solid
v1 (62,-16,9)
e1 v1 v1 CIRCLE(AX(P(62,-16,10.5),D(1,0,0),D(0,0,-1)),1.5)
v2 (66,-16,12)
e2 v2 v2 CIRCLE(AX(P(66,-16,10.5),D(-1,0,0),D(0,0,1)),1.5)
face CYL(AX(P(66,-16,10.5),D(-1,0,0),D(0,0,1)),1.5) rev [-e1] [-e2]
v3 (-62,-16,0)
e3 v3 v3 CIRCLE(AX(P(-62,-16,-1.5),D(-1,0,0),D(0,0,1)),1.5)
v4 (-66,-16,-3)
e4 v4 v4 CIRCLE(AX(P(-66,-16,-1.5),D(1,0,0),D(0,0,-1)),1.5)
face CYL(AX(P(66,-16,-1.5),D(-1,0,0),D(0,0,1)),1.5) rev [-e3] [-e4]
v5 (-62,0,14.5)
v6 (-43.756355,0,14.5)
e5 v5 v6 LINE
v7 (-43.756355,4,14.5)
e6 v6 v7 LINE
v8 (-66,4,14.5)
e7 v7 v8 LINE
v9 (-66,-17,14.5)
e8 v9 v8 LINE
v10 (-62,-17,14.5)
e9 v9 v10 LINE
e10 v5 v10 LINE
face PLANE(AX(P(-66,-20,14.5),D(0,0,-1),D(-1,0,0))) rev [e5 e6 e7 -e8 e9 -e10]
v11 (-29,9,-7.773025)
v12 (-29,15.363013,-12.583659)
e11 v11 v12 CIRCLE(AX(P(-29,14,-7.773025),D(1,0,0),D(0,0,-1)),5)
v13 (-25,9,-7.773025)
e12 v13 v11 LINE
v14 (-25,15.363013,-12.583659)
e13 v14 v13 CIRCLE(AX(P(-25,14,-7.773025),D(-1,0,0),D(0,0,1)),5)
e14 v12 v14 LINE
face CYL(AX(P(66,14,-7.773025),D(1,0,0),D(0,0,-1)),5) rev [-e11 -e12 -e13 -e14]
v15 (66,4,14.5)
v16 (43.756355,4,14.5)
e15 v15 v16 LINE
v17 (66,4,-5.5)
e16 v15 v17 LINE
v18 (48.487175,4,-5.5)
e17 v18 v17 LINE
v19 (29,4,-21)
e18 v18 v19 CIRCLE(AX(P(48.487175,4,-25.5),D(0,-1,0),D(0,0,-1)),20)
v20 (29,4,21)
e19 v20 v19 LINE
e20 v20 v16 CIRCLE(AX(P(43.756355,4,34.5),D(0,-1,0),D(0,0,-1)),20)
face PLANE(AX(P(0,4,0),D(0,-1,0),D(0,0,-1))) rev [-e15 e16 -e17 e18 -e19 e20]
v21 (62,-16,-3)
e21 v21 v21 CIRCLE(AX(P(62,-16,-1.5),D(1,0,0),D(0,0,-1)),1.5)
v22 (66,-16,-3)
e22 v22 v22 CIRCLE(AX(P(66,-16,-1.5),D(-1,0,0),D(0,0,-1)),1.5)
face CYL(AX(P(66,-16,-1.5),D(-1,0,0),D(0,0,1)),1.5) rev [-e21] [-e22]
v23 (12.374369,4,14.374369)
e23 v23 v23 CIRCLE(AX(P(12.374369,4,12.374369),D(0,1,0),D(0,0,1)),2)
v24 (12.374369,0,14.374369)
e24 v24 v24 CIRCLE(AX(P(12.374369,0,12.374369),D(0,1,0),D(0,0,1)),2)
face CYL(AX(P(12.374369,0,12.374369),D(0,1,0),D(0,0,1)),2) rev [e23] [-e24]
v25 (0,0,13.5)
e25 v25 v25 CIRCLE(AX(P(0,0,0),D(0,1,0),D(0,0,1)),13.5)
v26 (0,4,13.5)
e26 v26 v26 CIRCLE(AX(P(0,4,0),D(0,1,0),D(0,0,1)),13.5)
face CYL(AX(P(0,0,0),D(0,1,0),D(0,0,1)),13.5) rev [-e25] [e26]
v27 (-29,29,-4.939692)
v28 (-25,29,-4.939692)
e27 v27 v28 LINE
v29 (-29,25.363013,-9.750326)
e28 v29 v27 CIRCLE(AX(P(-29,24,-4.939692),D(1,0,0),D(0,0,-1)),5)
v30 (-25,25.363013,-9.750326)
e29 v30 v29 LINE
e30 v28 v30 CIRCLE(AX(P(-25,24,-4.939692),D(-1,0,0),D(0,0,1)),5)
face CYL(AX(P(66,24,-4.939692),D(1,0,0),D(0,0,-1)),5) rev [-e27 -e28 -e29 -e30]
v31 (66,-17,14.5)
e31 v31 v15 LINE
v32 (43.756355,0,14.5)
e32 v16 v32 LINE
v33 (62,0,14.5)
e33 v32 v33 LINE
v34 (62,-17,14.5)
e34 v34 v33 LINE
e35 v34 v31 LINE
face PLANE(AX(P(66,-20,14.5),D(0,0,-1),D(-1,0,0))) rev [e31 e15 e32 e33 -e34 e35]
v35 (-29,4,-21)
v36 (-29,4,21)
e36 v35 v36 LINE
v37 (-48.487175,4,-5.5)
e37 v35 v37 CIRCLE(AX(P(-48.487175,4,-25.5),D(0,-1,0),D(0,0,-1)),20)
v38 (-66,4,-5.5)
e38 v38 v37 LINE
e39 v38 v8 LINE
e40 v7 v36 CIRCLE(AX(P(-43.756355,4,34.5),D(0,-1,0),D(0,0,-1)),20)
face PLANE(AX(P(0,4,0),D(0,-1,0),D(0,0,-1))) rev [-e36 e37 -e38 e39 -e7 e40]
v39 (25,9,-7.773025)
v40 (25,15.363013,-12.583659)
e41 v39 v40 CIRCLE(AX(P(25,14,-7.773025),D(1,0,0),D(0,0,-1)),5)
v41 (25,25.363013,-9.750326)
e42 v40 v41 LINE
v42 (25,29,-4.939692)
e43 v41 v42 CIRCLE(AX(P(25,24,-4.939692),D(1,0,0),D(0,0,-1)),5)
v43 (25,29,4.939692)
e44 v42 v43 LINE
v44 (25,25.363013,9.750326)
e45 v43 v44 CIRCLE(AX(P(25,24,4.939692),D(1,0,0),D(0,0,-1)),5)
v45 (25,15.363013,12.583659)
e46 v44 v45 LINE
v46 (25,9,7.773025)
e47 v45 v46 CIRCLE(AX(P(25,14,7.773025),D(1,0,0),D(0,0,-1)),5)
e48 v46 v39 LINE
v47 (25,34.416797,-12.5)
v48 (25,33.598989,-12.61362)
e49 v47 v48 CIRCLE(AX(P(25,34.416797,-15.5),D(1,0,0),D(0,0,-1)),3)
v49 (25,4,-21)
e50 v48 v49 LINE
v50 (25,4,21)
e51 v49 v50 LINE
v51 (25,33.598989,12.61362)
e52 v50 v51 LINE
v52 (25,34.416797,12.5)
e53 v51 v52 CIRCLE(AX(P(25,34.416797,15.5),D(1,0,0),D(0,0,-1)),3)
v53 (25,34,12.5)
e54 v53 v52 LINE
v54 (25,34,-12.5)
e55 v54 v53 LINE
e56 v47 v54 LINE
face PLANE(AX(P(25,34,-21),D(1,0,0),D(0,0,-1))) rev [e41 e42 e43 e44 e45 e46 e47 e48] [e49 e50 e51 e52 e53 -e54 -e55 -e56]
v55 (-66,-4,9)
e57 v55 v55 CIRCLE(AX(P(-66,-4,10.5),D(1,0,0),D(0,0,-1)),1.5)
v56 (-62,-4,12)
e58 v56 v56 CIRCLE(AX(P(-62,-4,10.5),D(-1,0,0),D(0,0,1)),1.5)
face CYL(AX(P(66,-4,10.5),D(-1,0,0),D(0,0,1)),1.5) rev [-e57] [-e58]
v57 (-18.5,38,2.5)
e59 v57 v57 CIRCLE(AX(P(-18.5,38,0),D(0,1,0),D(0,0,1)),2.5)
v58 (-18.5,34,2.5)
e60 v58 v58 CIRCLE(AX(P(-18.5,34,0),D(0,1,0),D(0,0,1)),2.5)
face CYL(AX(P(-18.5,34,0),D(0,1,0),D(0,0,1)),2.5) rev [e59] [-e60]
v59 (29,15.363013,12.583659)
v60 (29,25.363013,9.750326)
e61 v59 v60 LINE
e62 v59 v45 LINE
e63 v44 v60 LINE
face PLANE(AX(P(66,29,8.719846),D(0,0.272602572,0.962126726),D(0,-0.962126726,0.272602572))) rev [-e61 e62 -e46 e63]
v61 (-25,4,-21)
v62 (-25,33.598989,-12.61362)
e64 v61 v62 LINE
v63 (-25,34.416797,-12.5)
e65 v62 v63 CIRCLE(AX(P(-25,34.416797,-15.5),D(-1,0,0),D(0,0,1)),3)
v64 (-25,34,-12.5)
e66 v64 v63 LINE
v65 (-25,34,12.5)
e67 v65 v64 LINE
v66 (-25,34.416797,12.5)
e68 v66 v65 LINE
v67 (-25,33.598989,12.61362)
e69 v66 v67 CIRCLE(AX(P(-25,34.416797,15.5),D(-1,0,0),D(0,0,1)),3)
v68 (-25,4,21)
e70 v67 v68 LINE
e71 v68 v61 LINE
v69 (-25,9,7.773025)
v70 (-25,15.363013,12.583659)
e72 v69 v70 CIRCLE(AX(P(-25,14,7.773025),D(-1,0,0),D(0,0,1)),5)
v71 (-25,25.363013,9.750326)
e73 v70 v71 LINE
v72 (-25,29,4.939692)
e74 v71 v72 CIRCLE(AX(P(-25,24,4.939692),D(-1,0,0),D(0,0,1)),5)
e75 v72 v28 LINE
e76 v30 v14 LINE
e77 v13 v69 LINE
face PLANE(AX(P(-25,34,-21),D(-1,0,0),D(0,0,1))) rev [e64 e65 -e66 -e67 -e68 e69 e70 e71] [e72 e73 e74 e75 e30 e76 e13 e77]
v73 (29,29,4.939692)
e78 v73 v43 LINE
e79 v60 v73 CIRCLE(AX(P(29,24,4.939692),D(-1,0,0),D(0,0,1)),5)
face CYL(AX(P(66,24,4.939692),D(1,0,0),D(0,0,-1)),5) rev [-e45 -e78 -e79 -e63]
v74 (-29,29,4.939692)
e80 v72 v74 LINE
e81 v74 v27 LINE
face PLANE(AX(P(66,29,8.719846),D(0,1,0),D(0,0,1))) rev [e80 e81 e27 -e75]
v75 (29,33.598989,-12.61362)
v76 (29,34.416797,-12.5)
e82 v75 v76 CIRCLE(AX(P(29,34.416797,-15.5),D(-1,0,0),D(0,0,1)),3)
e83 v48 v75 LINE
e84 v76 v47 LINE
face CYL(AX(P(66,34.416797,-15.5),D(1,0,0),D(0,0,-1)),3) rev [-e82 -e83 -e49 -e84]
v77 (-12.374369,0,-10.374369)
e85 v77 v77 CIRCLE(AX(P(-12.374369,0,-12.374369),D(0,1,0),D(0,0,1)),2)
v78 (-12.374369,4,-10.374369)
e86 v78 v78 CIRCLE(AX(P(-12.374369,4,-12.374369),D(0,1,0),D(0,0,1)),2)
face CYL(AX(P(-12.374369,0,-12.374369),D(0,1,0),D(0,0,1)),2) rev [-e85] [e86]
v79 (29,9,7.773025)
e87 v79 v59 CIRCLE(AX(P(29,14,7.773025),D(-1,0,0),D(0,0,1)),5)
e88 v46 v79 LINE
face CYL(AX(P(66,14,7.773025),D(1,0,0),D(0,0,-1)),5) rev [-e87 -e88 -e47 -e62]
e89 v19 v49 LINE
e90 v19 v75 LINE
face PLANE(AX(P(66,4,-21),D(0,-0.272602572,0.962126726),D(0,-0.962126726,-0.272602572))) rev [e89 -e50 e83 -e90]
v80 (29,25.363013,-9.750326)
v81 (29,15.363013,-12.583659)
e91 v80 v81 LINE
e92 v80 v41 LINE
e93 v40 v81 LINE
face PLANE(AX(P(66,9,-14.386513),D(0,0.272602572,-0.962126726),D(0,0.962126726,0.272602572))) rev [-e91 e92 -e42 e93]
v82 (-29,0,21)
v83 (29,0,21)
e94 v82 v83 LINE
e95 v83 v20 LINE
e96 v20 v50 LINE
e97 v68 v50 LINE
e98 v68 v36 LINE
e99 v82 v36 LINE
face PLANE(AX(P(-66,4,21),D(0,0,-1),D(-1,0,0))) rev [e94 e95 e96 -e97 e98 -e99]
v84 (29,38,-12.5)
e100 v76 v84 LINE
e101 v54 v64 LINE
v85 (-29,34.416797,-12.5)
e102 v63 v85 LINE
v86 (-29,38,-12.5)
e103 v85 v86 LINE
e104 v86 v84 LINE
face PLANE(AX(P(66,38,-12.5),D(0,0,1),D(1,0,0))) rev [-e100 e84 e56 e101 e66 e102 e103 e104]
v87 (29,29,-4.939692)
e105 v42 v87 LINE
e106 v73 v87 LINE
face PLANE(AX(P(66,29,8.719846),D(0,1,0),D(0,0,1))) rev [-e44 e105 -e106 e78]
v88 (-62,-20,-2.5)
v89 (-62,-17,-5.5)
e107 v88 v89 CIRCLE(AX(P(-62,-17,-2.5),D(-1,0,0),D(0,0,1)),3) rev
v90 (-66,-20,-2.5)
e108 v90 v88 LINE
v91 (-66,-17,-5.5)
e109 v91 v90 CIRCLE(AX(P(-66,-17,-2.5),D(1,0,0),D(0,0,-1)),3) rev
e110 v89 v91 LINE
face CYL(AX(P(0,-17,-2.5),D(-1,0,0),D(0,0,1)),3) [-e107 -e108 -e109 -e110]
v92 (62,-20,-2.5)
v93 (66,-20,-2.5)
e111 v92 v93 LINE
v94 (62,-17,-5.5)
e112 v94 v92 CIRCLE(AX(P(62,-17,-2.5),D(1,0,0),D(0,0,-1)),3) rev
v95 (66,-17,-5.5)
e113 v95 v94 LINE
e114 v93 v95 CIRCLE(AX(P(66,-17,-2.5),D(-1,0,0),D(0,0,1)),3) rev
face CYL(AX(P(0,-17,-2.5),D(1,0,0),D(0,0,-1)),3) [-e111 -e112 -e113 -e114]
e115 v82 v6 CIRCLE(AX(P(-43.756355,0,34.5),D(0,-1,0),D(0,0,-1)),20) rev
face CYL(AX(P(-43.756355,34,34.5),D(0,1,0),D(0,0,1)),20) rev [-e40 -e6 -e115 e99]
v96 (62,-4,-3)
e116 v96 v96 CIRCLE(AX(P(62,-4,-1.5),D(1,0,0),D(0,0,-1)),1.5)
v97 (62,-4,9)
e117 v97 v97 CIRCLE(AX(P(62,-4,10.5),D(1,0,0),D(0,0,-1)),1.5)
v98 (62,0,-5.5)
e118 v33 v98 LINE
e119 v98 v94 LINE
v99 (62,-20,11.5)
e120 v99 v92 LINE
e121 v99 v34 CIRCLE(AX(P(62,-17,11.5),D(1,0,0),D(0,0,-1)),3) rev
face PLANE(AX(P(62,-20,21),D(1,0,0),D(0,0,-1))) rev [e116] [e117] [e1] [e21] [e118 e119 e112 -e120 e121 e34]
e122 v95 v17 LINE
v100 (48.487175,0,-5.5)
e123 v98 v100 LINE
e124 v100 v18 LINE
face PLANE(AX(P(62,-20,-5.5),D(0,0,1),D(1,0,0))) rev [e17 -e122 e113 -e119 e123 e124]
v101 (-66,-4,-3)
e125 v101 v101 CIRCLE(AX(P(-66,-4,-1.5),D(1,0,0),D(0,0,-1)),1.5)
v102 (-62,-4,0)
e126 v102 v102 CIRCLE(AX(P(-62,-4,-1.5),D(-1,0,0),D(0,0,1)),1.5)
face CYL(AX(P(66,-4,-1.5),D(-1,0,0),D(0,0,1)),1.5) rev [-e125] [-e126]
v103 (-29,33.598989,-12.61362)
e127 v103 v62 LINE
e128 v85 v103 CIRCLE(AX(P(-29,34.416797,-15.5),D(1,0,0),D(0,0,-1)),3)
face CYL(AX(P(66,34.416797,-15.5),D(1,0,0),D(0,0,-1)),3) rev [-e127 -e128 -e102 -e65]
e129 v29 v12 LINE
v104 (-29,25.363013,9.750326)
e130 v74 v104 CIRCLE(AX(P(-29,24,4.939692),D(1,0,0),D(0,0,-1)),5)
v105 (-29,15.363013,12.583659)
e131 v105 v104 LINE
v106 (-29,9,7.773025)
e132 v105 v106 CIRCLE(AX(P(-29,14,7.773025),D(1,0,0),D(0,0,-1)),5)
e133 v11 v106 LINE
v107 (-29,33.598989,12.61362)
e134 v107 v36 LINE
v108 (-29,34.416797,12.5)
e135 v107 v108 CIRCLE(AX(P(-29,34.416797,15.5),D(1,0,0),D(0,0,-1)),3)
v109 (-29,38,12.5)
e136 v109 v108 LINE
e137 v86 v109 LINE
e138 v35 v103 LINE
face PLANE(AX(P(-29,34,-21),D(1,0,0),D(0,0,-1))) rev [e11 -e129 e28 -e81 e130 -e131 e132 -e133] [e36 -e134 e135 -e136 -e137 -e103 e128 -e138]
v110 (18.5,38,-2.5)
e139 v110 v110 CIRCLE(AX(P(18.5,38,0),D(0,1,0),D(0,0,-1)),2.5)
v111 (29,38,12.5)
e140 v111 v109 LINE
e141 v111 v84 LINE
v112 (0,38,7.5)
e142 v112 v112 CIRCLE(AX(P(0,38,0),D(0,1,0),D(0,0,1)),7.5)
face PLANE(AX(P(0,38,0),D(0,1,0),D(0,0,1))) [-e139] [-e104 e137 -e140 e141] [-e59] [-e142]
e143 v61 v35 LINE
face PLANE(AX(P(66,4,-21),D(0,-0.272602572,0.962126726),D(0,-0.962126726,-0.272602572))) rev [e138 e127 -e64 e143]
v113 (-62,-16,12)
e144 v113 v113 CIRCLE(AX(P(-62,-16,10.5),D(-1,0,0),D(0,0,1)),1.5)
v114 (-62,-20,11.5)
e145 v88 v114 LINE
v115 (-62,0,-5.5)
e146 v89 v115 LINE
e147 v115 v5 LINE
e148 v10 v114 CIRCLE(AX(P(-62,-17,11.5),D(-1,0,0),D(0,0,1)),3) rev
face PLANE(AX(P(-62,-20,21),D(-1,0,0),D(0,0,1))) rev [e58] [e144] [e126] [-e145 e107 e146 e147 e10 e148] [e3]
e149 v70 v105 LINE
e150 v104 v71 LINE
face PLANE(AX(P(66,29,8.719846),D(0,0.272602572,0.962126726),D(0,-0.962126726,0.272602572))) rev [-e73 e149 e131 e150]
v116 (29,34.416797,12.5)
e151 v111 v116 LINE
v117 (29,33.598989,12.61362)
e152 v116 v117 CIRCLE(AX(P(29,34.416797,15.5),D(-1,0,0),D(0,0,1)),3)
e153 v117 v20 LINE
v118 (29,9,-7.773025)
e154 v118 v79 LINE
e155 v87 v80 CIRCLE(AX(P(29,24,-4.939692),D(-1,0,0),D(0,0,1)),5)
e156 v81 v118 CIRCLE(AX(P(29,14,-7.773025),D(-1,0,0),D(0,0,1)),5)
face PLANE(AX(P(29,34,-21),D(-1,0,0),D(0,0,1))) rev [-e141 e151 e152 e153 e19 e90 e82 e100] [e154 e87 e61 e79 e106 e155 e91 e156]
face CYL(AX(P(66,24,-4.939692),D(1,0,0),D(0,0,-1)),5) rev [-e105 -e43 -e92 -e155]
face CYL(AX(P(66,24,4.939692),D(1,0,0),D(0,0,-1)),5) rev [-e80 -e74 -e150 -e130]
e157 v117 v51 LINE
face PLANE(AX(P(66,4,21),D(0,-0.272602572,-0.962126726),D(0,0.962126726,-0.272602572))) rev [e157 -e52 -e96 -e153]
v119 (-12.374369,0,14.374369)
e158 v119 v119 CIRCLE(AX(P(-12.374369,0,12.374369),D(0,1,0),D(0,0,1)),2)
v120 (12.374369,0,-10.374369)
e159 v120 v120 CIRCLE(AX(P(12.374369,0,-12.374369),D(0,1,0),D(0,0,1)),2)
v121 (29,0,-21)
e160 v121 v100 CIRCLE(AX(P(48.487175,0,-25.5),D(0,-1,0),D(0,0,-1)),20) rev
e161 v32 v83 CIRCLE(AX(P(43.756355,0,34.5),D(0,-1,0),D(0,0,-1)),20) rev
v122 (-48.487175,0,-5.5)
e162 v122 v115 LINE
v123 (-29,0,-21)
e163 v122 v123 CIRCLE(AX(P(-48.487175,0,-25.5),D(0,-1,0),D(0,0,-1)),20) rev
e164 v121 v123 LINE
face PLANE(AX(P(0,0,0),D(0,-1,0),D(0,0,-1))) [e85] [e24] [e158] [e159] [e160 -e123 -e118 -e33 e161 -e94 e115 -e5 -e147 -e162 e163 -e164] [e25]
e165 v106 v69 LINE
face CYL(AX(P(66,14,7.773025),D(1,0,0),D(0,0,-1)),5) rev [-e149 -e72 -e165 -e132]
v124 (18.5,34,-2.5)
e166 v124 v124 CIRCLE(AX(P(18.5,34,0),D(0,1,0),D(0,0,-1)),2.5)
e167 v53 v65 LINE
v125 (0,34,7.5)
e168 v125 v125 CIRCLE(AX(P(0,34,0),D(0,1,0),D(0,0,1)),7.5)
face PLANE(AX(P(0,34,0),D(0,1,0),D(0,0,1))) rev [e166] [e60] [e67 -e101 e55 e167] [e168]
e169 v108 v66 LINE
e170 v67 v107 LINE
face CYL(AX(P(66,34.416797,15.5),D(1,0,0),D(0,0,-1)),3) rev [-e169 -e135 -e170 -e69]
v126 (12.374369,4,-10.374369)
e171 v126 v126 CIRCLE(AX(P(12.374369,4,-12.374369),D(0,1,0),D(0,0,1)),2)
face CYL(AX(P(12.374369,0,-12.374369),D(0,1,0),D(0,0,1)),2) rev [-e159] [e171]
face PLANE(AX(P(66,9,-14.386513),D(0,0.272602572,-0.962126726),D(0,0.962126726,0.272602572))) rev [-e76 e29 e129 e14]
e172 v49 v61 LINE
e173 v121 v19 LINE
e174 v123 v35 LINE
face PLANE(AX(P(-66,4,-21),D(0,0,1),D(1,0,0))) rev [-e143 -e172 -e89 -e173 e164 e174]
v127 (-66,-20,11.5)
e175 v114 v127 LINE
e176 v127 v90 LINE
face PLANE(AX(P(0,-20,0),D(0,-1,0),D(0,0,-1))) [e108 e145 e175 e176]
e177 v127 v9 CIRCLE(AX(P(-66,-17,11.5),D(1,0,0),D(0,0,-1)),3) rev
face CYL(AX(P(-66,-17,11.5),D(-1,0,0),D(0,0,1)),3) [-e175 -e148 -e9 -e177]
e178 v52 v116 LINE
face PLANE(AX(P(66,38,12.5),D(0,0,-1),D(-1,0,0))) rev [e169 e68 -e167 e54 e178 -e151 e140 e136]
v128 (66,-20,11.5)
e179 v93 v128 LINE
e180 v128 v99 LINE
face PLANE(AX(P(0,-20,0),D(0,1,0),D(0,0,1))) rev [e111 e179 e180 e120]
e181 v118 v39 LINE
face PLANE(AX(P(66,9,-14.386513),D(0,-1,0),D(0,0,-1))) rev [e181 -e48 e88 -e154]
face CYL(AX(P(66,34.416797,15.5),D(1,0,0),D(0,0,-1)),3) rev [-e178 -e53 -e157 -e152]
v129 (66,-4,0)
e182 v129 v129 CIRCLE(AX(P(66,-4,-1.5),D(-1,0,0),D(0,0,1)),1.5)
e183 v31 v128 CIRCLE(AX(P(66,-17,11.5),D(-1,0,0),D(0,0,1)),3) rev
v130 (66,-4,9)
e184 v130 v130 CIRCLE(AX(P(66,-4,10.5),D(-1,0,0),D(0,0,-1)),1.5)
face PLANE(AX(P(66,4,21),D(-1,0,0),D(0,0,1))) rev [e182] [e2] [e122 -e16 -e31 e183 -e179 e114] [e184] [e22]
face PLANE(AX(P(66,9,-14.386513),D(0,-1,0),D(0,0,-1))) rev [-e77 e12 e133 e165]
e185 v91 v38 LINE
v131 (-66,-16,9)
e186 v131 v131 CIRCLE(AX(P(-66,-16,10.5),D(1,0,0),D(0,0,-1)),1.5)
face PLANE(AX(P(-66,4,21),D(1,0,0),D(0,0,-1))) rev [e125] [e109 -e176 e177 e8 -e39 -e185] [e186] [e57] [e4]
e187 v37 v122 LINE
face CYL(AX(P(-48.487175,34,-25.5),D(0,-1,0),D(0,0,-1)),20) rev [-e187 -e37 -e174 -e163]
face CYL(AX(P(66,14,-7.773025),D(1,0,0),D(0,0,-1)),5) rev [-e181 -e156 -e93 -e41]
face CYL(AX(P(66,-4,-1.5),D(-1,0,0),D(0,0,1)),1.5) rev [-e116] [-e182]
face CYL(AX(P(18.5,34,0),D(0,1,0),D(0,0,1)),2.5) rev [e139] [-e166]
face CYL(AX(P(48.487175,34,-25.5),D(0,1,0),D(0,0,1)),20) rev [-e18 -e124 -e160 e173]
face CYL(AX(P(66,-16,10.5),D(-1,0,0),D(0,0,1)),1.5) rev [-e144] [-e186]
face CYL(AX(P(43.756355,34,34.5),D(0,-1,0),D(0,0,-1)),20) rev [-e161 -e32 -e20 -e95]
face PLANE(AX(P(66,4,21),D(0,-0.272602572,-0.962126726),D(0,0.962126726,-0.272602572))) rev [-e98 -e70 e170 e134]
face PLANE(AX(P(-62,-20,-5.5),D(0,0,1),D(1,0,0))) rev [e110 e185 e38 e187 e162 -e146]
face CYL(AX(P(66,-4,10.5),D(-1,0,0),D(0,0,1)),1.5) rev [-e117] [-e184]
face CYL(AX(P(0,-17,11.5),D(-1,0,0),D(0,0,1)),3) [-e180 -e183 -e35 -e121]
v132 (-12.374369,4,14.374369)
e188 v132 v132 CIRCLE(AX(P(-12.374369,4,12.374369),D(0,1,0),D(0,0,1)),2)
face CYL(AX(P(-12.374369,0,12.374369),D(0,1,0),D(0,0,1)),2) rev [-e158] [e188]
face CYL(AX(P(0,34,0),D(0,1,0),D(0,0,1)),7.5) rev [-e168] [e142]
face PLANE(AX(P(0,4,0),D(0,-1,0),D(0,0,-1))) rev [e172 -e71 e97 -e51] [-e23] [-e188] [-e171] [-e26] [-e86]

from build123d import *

# Parameters (mm, degrees)
SKETCH_1_W               = 132
SKETCH_1_H               = 42
EXTRUDE_1_DEPTH          = 4
SKETCH_2_R               = 2
SKETCH_2_R_2             = 13.5
CUT_EXTRUDE_1_DEPTH      = 4
SKETCH_3_W               = 4
SKETCH_3_H               = 42
EXTRUDE_2_DEPTH          = 30
SKETCH_4_W               = 58
SKETCH_4_H               = 42
EXTRUDE_3_DEPTH          = 4
SKETCH_5_W               = 4
SKETCH_5_H               = 42
EXTRUDE_4_DEPTH          = 20
SKETCH_6_R               = 7.5
SKETCH_6_R_2             = 2.5
CUT_EXTRUDE_2_DEPTH      = 4
CUT_EXTRUDE_3_DEPTH      = 105.450945424
FILLET_1_R               = 3
SKETCH_8_W               = 37
SKETCH_8_H               = 6.5
CUT_EXTRUDE_4_DEPTH      = 24
FILLET_2_R               = 20
CUT_EXTRUDE_6_DEPTH      = 105.450945424
CUT_EXTRUDE_7_DEPTH      = 139.956827828
CUT_EXTRUDE_7_DEPTH_BACK = 139.956827828
SKETCH_12_R              = 1.5
FILLET_5_R               = 3
FILLET_6_R               = 5


with BuildPart() as part:
    # 草图1 → 凸台-拉伸1 (new body)
    with BuildSketch(Plane(origin=(0, 0, 0), x_dir=(1, 0, 0), z_dir=(0, 1, 0))):
        Rectangle(SKETCH_1_W, SKETCH_1_H)
    extrude(amount=EXTRUDE_1_DEPTH)

    # 草图2 → 切除-拉伸1 (cut)
    with BuildSketch(Plane(origin=(0, 4, 0), x_dir=(1, 0, 0), z_dir=(0, 1, 0))):
        with Locations(Location((12.374368671, 12.374368671, 0), (0, 0, 270))):
            Circle(SKETCH_2_R)
        with Locations(Location((12.374368671, -12.374368671, 0), (0, 0, 270))):
            Circle(SKETCH_2_R)
        with Locations(Location((-12.374368671, -12.374368671, 0), (0, 0, 270))):
            Circle(SKETCH_2_R)
        with Locations(Location((-12.374368671, 12.374368671, 0), (0, 0, 270))):
            Circle(SKETCH_2_R)
        with Locations(Location((0, 0, 0), (0, 0, 270))):
            Circle(SKETCH_2_R_2)
    extrude(amount=-CUT_EXTRUDE_1_DEPTH, mode=Mode.SUBTRACT)

    # 草图3 → 凸台-拉伸2 (add)
    with BuildSketch(Plane(origin=(0, 4, 0), x_dir=(1, 0, 0), z_dir=(0, 1, 0))):
        with Locations((27, 0)):
            Rectangle(SKETCH_3_W, SKETCH_3_H)
        with Locations((-27, 0)):
            Rectangle(SKETCH_3_W, SKETCH_3_H)
    extrude(amount=EXTRUDE_2_DEPTH)

    # 草图4 → 凸台-拉伸3 (add)
    with BuildSketch(Plane(origin=(0, 34, 0), x_dir=(1, 0, 0), z_dir=(0, 1, 0))):
        Rectangle(SKETCH_4_W, SKETCH_4_H)
    extrude(amount=EXTRUDE_3_DEPTH)

    # 草图5 → 凸台-拉伸4 (add)
    with BuildSketch(Plane.XZ):
        with Locations((64, 0)):
            Rectangle(SKETCH_5_W, SKETCH_5_H)
        with Locations((-64, 0)):
            Rectangle(SKETCH_5_W, SKETCH_5_H)
    extrude(amount=EXTRUDE_4_DEPTH)

    # 草图6 → 切除-拉伸2 (cut)
    with BuildSketch(Plane(origin=(0, 38, 0), x_dir=(1, 0, 0), z_dir=(0, 1, 0))):
        with Locations(Location((0, 0, 0), (0, 0, 270))):
            Circle(SKETCH_6_R)
        with Locations(Location((-18.5, 0, 0), (0, 0, 270))):
            Circle(SKETCH_6_R_2)
        with Locations(Location((18.5, 0, 0), (0, 0, 90))):
            Circle(SKETCH_6_R_2)
    extrude(amount=-CUT_EXTRUDE_2_DEPTH, mode=Mode.SUBTRACT)

    # 草图7 → 切除-拉伸3 (cut, through all)
    with BuildSketch(Plane.ZY.offset(29)):
        Polygon((-21, 4), (-12.5, 34), (-12.5, 38), (-21, 38), align=None)
        Polygon((21, 38), (12.5, 38), (12.5, 34), (21, 4), align=None)
    extrude(amount=-CUT_EXTRUDE_3_DEPTH, mode=Mode.SUBTRACT)

    # 圆角1
    fillet_1_edges = [part.edges().sort_by_distance(p)[0] for p in [
        (-27, 34, -12.5),
        (27, 34, -12.5),
        (27, 34, 12.5),
        (-27, 34, 12.5),
    ]]
    fillet(fillet_1_edges, radius=FILLET_1_R)

    # 草图8 → 切除-拉伸4 (cut)
    with BuildSketch(Plane(origin=(0, 4, 0), x_dir=(1, 0, 0), z_dir=(0, 1, 0))):
        Polygon((-66, 5.5), (-66, 21), (-29, 21), (-29, 5.5), (-62, 5.5), align=None)
        with Locations((47.5, -17.75)):
            Rectangle(SKETCH_8_W, SKETCH_8_H)
        Polygon((66, 5.5), (66, 21), (29, 21), (29, 5.5), (62, 5.5), align=None)
        with Locations((-47.5, -17.75)):
            Rectangle(SKETCH_8_W, SKETCH_8_H)
    extrude(amount=-CUT_EXTRUDE_4_DEPTH, mode=Mode.SUBTRACT)

    # 圆角2
    # the kernel refuses this fillet: 20 mm, written as the material it adds along each edge
    with BuildSketch(Plane(origin=(29, 4, 14.5), x_dir=(0, 0, 1), z_dir=(0, -1, 0))) as fillet_2_piece_1:
        with BuildLine():
            CenterArc((20, -14.756354563), FILLET_2_R, 132.454150204, 47.545849796)
            Line((0, -14.756354563), (0, 0))
            Line((0, 0), (6.5, 0))
        make_face()
    extrude(amount=4)
    with BuildSketch(Plane(origin=(29, 4, -5.5), x_dir=(0, 0, -1), z_dir=(0, -1, 0))) as fillet_2_piece_2:
        with BuildLine():
            CenterArc((20, 19.48717527), FILLET_2_R, 180, 76.997121837)
            Line((0, 19.48717527), (0, 0))
            Line((0, 0), (15.5, 0))
        make_face()
    extrude(amount=4)
    with BuildSketch(Plane(origin=(-29, 4, -5.5), x_dir=(0, 0, -1), z_dir=(0, -1, 0))) as fillet_2_piece_3:
        with BuildLine():
            CenterArc((20, -19.48717527), FILLET_2_R, 103.002878163, 76.997121837)
            Line((0, -19.48717527), (0, 0))
            Line((0, 0), (15.5, 0))
        make_face()
    extrude(amount=4)
    with BuildSketch(Plane(origin=(-29, 4, 14.5), x_dir=(0, 0, 1), z_dir=(0, -1, 0))) as fillet_2_piece_4:
        with BuildLine():
            CenterArc((20, 14.756354563), FILLET_2_R, 180, 47.545849796)
            Line((0, 14.756354563), (0, 0))
            Line((0, 0), (6.5, 0))
        make_face()
    extrude(amount=4)

    # 草图11 → 切除-拉伸6 (cut, through all)
    with BuildSketch(Plane.ZY.offset(29)):
        Polygon((8.719846057, 29), (-8.719846057, 29), (-14.386512724, 9), (14.386512724, 9), align=None)
    extrude(amount=-CUT_EXTRUDE_6_DEPTH, mode=Mode.SUBTRACT)

    # 草图12 → 切除-拉伸7 (cut, two sides: drawn at the far end of the back side and taken through both)
    with BuildSketch(Plane.ZY.offset(66).offset(-CUT_EXTRUDE_7_DEPTH_BACK)):
        with Locations((-1.5, -4)):
            Circle(SKETCH_12_R)
        with Locations(Location((10.5, -4, 0), (0, 0, 180))):
            Circle(SKETCH_12_R)
        with Locations((10.5, -16)):
            Circle(SKETCH_12_R)
        with Locations(Location((-1.5, -16, 0), (0, 0, 180))):
            Circle(SKETCH_12_R)
    extrude(amount=CUT_EXTRUDE_7_DEPTH + CUT_EXTRUDE_7_DEPTH_BACK, mode=Mode.SUBTRACT)

    # 圆角5
    fillet_5_edges = [part.edges().sort_by_distance(p)[0] for p in [
        (64, -20, -5.5),
        (-64, -20, 14.5),
        (64, -20, 14.5),
        (-64, -20, -5.5),
    ]]
    fillet(fillet_5_edges, radius=FILLET_5_R)

    # 圆角6
    fillet_6_edges = [part.edges().sort_by_distance(p)[0] for p in [
        (-27, 29, 8.719846057),
        (27, 29, 8.719846057),
        (-27, 9, 14.386512724),
        (27, 9, 14.386512724),
        (-27, 9, -14.386512724),
        (27, 9, -14.386512724),
        (-27, 29, -8.719846057),
        (27, 29, -8.719846057),
    ]]
    fillet(fillet_6_edges, radius=FILLET_6_R)


solid = part.part
